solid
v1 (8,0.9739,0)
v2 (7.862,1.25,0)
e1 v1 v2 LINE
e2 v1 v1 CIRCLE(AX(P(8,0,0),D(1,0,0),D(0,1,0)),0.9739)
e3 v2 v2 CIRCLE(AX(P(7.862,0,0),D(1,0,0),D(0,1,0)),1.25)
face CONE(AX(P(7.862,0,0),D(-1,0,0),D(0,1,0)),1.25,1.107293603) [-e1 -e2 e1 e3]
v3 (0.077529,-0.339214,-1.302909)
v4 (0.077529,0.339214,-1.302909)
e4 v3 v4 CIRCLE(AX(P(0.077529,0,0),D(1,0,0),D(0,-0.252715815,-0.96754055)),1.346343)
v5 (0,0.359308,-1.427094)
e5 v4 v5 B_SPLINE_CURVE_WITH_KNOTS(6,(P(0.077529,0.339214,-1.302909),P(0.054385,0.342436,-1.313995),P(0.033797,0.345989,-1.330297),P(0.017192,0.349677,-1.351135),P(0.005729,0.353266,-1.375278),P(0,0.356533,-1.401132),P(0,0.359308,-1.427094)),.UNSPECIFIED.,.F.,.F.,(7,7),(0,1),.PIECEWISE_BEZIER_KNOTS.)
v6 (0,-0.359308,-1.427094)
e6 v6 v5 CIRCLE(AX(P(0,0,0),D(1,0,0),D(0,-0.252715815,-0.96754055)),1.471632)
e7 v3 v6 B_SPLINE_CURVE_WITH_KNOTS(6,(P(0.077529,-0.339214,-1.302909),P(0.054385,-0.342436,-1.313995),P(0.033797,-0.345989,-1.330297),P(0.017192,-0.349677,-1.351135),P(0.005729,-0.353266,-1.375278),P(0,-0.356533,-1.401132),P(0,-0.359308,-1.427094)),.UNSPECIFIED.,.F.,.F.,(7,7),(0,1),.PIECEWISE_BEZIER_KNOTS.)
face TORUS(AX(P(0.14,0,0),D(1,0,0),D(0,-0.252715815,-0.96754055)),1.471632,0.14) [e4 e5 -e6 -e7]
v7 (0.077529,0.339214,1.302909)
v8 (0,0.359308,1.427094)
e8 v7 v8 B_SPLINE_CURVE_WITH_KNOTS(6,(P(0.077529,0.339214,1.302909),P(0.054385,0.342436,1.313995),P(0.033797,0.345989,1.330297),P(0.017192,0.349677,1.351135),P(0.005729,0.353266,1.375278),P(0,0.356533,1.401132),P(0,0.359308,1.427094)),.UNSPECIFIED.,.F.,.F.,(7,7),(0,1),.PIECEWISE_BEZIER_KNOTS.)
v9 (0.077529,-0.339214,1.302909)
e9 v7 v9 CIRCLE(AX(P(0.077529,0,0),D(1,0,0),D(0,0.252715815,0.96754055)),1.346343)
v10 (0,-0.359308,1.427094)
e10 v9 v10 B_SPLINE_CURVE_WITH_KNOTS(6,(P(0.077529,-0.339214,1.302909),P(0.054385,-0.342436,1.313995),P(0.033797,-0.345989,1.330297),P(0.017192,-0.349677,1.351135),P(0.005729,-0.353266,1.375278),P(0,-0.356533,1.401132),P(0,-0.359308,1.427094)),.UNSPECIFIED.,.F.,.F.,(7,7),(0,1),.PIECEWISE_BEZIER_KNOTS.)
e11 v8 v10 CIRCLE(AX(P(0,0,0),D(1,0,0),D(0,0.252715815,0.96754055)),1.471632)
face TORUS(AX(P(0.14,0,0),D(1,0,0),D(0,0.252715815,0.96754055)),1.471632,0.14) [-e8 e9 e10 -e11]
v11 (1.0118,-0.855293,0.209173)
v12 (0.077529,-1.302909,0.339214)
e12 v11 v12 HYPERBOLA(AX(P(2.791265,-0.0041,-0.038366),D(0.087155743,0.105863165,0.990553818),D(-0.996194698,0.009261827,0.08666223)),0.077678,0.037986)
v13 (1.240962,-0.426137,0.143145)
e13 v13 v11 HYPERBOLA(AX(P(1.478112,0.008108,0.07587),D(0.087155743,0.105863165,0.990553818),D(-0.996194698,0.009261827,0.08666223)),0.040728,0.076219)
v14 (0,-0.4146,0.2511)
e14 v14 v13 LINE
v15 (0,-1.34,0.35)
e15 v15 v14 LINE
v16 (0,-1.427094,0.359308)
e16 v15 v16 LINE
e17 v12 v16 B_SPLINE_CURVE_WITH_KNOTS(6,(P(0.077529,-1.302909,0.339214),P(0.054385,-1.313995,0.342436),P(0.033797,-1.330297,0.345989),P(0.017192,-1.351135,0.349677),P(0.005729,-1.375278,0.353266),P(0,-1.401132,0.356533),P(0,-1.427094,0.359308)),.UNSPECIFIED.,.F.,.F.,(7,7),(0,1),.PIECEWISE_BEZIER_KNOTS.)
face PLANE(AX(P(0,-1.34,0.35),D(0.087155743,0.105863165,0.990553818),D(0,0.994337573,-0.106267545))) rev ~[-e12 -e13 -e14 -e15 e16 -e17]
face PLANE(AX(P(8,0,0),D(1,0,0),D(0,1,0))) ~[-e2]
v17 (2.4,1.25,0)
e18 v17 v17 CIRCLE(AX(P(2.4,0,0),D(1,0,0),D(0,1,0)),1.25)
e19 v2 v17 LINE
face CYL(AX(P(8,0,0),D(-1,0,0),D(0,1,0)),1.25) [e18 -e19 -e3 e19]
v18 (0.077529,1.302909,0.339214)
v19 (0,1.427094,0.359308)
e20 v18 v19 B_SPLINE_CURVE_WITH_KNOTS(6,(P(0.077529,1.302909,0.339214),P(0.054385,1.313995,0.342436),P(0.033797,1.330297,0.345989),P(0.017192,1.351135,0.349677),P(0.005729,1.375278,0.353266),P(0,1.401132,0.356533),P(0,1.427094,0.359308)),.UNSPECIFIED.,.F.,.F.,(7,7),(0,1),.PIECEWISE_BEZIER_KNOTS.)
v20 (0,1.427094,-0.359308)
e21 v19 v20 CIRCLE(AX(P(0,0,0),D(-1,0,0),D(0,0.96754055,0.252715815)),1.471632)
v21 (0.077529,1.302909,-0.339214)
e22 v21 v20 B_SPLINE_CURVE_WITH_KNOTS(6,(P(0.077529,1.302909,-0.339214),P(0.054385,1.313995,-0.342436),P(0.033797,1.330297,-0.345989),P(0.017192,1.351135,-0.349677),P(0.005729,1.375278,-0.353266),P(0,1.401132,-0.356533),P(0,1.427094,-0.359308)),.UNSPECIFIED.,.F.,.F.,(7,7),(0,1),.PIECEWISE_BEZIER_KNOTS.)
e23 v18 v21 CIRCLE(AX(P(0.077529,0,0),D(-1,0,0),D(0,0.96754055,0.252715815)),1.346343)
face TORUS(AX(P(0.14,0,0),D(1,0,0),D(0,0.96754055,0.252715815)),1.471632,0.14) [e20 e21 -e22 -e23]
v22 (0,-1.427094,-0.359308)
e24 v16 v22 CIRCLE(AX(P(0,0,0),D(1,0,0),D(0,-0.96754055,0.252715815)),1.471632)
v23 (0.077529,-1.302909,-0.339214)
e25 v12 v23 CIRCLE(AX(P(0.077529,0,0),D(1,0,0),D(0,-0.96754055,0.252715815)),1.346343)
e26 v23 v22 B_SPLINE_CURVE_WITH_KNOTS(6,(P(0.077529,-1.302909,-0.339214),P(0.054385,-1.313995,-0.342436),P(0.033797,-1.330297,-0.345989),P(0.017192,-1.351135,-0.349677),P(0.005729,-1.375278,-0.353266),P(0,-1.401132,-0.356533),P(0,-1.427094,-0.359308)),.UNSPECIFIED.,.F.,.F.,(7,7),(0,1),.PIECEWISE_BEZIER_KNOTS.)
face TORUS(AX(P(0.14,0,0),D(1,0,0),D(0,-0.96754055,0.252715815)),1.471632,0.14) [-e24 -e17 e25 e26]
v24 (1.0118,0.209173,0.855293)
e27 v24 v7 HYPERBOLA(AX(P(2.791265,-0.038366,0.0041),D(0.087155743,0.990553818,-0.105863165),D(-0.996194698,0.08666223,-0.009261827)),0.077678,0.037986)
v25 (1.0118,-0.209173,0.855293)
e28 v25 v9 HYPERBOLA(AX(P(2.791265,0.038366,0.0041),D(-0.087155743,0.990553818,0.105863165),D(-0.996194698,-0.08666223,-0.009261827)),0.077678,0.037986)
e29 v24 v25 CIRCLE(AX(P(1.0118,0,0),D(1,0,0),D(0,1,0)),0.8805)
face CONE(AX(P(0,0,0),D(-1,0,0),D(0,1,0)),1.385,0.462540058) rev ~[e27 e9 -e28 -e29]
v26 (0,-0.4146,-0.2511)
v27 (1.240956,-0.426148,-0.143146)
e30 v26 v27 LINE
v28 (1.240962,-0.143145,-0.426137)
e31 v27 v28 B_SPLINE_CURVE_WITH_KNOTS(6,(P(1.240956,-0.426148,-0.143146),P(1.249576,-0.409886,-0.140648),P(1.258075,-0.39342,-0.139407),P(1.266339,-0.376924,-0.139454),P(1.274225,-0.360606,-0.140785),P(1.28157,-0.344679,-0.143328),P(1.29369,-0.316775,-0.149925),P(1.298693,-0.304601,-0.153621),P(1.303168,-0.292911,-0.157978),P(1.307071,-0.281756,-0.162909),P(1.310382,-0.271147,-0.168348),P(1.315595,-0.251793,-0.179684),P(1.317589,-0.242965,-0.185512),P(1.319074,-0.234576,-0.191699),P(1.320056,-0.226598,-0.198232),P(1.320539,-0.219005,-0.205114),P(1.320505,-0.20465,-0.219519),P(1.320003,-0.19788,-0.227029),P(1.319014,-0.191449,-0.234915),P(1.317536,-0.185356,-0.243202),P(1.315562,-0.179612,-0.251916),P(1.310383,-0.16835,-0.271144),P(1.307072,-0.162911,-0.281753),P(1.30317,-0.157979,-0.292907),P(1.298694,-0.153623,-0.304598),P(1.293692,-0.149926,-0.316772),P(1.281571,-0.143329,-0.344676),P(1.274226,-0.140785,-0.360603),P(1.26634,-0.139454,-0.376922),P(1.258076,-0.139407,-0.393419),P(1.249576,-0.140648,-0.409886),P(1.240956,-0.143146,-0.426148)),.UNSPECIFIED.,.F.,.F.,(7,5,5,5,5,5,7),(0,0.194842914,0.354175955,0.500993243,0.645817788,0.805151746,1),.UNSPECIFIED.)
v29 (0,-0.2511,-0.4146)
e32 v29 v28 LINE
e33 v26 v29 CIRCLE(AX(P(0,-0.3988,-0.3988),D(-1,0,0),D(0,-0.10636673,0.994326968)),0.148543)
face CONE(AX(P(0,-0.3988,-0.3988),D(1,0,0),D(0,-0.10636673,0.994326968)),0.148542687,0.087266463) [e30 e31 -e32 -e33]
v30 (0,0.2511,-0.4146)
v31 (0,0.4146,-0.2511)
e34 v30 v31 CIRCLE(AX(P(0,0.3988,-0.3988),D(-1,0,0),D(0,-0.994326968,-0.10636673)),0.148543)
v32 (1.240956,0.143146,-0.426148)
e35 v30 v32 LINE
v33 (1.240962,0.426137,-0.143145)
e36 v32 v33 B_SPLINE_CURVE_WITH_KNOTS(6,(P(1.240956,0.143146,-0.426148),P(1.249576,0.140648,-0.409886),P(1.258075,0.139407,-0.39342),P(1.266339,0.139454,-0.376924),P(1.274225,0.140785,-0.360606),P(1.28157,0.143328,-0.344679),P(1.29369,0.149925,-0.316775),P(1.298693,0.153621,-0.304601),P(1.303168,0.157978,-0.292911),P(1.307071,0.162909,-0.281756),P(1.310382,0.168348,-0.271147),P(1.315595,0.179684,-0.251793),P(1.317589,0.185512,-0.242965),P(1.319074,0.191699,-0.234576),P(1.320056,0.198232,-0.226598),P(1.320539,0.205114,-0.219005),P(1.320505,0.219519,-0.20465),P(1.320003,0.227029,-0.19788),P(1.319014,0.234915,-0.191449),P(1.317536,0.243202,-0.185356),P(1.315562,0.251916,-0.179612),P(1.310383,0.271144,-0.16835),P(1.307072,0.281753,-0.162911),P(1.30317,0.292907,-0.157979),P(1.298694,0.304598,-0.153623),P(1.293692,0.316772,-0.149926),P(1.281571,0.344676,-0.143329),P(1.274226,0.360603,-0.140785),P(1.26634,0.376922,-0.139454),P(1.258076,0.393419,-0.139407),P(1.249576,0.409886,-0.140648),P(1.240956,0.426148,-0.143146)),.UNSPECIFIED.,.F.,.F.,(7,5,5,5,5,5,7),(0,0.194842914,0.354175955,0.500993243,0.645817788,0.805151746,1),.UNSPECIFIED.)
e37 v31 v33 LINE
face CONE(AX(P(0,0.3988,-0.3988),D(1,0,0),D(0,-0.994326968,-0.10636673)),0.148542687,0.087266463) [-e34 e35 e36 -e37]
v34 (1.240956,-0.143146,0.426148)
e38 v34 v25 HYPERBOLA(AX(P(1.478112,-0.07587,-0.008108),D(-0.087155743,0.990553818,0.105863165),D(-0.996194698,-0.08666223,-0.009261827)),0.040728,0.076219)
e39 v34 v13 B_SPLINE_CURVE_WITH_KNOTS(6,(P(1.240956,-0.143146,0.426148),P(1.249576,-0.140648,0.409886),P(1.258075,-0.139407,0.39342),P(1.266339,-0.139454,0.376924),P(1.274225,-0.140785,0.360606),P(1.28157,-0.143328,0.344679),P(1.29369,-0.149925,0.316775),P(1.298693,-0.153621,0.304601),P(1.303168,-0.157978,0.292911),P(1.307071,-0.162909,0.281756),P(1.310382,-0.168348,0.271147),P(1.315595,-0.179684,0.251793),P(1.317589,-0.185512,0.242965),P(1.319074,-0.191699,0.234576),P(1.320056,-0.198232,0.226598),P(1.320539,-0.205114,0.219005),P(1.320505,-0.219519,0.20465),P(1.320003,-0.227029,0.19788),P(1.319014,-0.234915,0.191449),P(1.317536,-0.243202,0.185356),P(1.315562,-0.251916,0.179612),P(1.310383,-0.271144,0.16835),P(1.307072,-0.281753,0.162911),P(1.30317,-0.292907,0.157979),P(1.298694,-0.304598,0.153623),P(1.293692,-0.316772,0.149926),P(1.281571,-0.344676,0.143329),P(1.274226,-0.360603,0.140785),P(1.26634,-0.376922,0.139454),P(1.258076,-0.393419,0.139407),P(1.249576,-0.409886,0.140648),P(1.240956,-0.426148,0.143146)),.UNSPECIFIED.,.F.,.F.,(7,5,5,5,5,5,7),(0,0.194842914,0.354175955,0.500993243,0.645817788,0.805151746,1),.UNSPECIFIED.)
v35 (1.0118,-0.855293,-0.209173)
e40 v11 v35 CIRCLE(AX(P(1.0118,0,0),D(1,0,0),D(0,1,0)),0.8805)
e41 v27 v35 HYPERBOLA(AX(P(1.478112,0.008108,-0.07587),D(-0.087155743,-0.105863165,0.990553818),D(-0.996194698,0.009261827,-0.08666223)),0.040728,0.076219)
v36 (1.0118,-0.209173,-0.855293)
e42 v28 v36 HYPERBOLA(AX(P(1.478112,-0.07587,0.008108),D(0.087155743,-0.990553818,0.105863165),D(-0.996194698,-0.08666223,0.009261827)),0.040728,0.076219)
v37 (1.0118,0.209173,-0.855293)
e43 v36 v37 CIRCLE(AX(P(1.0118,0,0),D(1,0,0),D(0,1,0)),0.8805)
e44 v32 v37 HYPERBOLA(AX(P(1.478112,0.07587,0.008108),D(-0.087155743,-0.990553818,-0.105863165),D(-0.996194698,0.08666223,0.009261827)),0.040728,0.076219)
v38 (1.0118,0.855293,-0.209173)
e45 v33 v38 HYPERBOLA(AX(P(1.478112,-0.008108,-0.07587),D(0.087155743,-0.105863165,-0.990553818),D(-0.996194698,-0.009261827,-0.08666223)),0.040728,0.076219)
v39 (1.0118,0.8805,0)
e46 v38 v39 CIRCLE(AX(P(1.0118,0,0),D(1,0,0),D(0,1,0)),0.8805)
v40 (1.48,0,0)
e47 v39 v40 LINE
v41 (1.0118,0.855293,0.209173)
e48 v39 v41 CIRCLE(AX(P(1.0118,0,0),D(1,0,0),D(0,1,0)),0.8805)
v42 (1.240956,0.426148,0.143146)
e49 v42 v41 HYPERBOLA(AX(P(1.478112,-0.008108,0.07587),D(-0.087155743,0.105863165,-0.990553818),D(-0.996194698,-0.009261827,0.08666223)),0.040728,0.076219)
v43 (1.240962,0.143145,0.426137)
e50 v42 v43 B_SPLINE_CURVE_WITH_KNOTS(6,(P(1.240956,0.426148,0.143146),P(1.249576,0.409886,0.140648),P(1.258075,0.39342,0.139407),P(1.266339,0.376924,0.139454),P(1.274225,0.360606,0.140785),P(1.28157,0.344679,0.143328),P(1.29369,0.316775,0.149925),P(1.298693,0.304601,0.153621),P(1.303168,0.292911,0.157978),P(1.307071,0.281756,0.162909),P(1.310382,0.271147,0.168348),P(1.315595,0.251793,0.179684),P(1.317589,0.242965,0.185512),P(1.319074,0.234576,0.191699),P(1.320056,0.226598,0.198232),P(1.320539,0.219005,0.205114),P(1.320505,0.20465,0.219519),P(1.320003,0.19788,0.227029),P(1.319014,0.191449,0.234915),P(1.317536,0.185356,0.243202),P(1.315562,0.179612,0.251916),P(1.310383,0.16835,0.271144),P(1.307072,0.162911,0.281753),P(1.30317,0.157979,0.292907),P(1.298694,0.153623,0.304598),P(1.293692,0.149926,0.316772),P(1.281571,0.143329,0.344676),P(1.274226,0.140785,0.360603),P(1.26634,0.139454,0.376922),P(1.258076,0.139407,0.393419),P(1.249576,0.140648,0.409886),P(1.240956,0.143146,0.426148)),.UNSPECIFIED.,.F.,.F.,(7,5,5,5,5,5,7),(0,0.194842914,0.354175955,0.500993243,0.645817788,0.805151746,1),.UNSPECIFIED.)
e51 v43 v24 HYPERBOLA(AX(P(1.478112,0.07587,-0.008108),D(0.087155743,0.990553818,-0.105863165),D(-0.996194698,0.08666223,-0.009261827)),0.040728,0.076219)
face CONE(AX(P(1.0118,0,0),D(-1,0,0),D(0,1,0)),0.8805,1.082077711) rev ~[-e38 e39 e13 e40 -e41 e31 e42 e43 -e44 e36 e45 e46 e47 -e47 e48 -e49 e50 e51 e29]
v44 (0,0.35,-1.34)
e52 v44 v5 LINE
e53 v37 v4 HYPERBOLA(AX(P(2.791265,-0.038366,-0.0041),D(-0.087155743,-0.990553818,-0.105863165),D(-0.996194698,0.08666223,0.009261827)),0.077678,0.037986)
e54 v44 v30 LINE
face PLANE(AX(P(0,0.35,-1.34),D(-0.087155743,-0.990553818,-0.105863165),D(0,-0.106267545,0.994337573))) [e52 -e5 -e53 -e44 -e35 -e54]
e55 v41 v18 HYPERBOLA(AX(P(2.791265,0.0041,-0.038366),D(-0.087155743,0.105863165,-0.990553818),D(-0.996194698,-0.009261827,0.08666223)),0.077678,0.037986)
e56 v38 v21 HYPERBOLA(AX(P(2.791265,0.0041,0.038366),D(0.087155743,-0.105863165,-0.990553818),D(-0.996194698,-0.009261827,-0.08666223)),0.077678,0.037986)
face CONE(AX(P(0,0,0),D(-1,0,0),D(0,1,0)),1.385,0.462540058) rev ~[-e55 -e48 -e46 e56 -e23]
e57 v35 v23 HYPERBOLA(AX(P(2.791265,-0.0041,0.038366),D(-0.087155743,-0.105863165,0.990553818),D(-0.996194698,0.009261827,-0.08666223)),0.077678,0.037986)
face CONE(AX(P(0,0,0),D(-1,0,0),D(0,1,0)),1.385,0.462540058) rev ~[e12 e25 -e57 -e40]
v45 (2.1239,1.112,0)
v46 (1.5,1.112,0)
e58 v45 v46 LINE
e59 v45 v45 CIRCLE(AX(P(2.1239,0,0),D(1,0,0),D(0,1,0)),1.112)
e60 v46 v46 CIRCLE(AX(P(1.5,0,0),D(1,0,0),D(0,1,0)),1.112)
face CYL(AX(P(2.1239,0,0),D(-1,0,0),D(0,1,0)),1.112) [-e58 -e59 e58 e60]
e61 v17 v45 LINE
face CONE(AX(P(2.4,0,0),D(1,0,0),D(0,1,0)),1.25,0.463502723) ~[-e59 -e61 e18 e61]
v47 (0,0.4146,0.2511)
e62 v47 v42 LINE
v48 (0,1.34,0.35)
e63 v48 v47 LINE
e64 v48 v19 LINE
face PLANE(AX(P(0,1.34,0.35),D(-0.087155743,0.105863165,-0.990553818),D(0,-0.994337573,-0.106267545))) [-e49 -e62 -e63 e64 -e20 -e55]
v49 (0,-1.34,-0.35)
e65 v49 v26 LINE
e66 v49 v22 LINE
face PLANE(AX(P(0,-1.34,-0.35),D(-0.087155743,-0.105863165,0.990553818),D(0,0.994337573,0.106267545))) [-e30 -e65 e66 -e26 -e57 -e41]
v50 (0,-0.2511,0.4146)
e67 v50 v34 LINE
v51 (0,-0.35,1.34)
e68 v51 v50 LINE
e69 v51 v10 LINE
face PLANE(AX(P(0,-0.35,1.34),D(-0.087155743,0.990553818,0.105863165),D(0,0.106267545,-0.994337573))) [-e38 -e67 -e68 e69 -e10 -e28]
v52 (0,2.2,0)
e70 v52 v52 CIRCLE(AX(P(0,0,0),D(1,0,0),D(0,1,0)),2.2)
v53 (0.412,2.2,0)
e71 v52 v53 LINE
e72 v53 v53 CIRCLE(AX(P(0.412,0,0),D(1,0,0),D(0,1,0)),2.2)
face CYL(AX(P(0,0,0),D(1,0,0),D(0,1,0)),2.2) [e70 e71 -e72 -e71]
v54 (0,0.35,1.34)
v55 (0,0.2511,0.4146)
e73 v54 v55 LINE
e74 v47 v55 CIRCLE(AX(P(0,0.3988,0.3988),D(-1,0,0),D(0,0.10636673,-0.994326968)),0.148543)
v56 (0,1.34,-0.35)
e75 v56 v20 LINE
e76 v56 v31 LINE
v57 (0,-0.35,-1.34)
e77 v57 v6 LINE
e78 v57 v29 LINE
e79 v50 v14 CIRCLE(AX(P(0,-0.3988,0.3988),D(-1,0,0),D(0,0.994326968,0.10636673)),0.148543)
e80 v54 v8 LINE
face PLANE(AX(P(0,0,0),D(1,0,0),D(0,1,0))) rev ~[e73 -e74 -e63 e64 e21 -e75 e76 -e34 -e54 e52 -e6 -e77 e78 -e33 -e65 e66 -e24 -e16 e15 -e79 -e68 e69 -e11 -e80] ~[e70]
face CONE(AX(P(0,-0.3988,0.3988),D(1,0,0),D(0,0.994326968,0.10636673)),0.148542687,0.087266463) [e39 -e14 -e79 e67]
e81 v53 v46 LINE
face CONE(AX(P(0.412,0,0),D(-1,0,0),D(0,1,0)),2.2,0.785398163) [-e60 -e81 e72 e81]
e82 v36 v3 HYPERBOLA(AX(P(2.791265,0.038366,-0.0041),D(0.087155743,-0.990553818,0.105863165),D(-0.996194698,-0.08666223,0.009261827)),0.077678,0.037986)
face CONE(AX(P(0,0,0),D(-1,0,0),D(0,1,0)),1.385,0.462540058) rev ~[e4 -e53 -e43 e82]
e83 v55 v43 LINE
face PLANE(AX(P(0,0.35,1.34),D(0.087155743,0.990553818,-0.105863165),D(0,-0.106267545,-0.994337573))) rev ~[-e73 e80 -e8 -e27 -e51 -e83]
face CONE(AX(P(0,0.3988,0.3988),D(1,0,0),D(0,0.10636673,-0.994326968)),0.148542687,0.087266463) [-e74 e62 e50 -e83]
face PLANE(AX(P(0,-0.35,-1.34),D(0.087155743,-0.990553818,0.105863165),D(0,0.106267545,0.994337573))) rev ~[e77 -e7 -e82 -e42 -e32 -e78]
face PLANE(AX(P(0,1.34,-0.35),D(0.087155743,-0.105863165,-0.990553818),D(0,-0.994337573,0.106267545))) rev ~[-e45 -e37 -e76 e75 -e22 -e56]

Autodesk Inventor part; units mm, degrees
ref_plane "YZ Plane" through (0, 0, 0) normal (1, 0, 0) x (0, 1, 0)
ref_plane "XZ Plane" through (0, 0, 0) normal (0, 1, 0) x (-1, 0, 0)
sketch "Szkic1" plane through (0, 0, 0) normal (0, 0, 1) x (1, 0, 0)
  line L0 (1.48, 0) -> (8, 0)
  line L1 (8, 0) -> (8, 1.25)
  line L2 (8, 1.25) -> (2.4, 1.25)
  line L3 (2.4, 1.25) -> (2.1239, 1.112)
  line L4 (2.1239, 1.112) -> (1.5, 1.112)
  line L5 (0, 2.2) -> (0, 1.385)
  line L6 (0, 1.385) -> (1.0118, 0.8805)
  line L7 (1.0118, 0.8805) -> (1.48, 0)
  line L8 (-1.6, 0) -> (9.6, 0) projected
  line L9 (0, -0.44) -> (0, 2.64) projected
  line L10 (0, 2.2) -> (0.412, 2.2)
  line L11 (0.412, 2.2) -> (1.5, 1.112)
  line L12 (2.4, 1.25) -> (1.362, 1.25) construction
  dimension "d1" = 5.6
  dimension "d2" = 2.5
  dimension "d3" = 2.2239
  dimension "d4" = 2.77
  dimension "d5" = 26.5
  dimension "d6" = 62
  dimension "d7" = 1.48
  dimension "d8" = 0.2761
  dimension "d12" = 4.4
  dimension "d13" = 45
  dimension "d15" = 8
  dimension "d24" = 1.5
revolve "Bryła" add sketch "Szkic1" angle 360 about axis through (1.48, 0, 0) along (1, 0, 0) contours L7 L6 L5 L10 L11 L4 L3 L2 L1 L0
sketch "Szkic2" plane through (0, 0, 0) normal (-1, 0, 0) x (0, 0, 1)
  line L0 (0, 1.385) -> (0, 0) construction
  line L1 (0, 0) -> (1.385, 0) construction
  arc A0 (0.4155, 0) -> (0, 0.4155) centre (0, 0) ccw construction
  arc A1 (0.4848, 0) -> (0, 0.4848) centre (0, 0) ccw construction
  arc A2 (1.34, 0.35) -> (0.35, 1.34) centre (0, 0) ccw
  line L2 (0, 0) -> (0.9793, 0.9793) construction
  line L3 (0.35, 1.34) -> (0.2511, 0.4146)
  line L4 (1.34, 0.35) -> (0.4146, 0.2511)
  arc A3 (0.35, 1.34) -> (0, 1.385) centre (0, 0) ccw
  arc A4 (1.385, 0) -> (1.34, 0.35) centre (0, 0) ccw
  line L5 (0, -3.08) -> (0, 3.08) projected
  line L6 (-3.08, 0) -> (3.08, 0) projected
  arc A5 (0.35, -1.34) -> (1.34, -0.35) centre (0, 0) ccw
  line L7 (0.35, -1.34) -> (0.2511, -0.4146)
  line L8 (1.34, -0.35) -> (0.4146, -0.2511)
  arc A6 (0, -1.385) -> (0.35, -1.34) centre (0, 0) ccw
  arc A7 (1.34, -0.35) -> (1.385, 0) centre (0, 0) ccw
  arc A8 (-0.35, 1.34) -> (-1.34, 0.35) centre (0, 0) ccw
  line L9 (-0.35, 1.34) -> (-0.2511, 0.4146)
  line L10 (-1.34, 0.35) -> (-0.4146, 0.2511)
  arc A9 (0, 1.385) -> (-0.35, 1.34) centre (0, 0) ccw
  arc A10 (-1.34, 0.35) -> (-1.385, 0) centre (0, 0) ccw
  arc A11 (-0.35, -1.34) -> (0, -1.385) centre (0, 0) ccw
  arc A12 (-1.34, -0.35) -> (-0.35, -1.34) centre (0, 0) ccw
  arc A13 (-1.385, 0) -> (-1.34, -0.35) centre (0, 0) ccw
  line L11 (-1.34, -0.35) -> (-0.4146, -0.2511)
  line L12 (-0.35, -1.34) -> (-0.2511, -0.4146)
  arc A14 (0.2511, 0.4146) -> (0.4146, 0.2511) centre (0.3988, 0.3988) ccw
  arc A15 (0.4146, -0.2511) -> (0.2511, -0.4146) centre (0.3988, -0.3988) ccw
  arc A16 (-0.4146, 0.2511) -> (-0.2511, 0.4146) centre (-0.3988, 0.3988) ccw
  arc A17 (-0.2511, -0.4146) -> (-0.4146, -0.2511) centre (-0.3988, -0.3988) ccw
  point P0 (0.9793, -0.9793)
  point P1 (-0.9793, 0.9793)
  point P2 (-0.9793, -0.9793)
  dimension "d17" = 0.831
  dimension "d18" = 0.9695
  dimension "d19" = 2.77
  dimension "d20" = 45
  dimension "d21" = 0.35
extrude "Szczelina" add sketch "Szkic2" against normal up to next draft 5 contours L4 A14 L3 A2 | A5 L7 A15 L8 | L9 A16 L10 A8 | A12 L11 A17 L12
fillet "Zaokrąglenie1" radius 0.14 4 edges at (0, 1.385, 0) (0, 0, -1.385) (0, -1.385, 0) (0, 0, 1.385)
thread "Gwint" size "M2.5x0.45" class "6g" standard "ISO Metric profile" length 5.6
chamfer "Faza1" distance 0.2761 distance2 0.138 1 edges at (8, -1.25, 0) measured on face at (8, -0.3689, 0.1936)
ref_plane "Work Plane2" through (3.35, 0, 0) normal (0, 0, -1) x (1, 0, 0)
equation "\"d1\" = GEL"
equation "\"d2\" = GD"
equation "\"d3\" = BDM"
equation "\"d4\" = SDM"
equation "\"d7\" = INTI"
equation "\"d8\" = GAL"
equation "\"d12\" = KOD"
equation "\"d13\" = 0.5 * SEWI"
equation "\"d15\" = NLG"
equation "\"d24\" = KOH"
equation "\"d17\" = 0.3 * SDM"
equation "\"d18\" = 0.35 * SDM"
equation "\"d19\" = SDM"
equation "\"d21\" = 0.5 * SBR"
equation "\"d23\" = 0.2 * SBR"
equation "\"d10\" = GEL"
equation "\"d25\" = -0.5 * SPD + 0.5 * GD"
equation "\"d26\" = 0.5 * GAL"
equation "\"NLG\" = 8"
equation "\"GEL\" = 5.6"
equation "\"GAL\" = 0.61345 * PTC"
equation "\"SPD\" = NND - 1.2269 * PTC"
equation "\"KOD\" = 4.4"
equation "\"KOH\" = 1.5"
equation "\"SBR\" = 0.7"
equation "\"INTI\" = 1.48"
equation "\"SDM\" = 2.77"
equation "\"GD\" = NND"
equation "\"BDM\" = NND - GAL"
equation "\"SEWI\" = 90deg"
equation "\"d9\" = SDM"
equation "\"GUL\" = 0.61345 * PTC"
equation "\"TOA\" = 30deg"
equation "\"EPV\" = 2.75"
equation "\"THREADDIA\" = 2.5"
equation "\"RR\" = 0.3"
equation "\"PTC\" = 0.45"
equation "\"NND\" = 2.5"
equation "\"GD1\" = THREADDIA - 1.2269 * PTC"
properties part number "AS 1427 - M2,5 x 8" material "Stal, miękka"
